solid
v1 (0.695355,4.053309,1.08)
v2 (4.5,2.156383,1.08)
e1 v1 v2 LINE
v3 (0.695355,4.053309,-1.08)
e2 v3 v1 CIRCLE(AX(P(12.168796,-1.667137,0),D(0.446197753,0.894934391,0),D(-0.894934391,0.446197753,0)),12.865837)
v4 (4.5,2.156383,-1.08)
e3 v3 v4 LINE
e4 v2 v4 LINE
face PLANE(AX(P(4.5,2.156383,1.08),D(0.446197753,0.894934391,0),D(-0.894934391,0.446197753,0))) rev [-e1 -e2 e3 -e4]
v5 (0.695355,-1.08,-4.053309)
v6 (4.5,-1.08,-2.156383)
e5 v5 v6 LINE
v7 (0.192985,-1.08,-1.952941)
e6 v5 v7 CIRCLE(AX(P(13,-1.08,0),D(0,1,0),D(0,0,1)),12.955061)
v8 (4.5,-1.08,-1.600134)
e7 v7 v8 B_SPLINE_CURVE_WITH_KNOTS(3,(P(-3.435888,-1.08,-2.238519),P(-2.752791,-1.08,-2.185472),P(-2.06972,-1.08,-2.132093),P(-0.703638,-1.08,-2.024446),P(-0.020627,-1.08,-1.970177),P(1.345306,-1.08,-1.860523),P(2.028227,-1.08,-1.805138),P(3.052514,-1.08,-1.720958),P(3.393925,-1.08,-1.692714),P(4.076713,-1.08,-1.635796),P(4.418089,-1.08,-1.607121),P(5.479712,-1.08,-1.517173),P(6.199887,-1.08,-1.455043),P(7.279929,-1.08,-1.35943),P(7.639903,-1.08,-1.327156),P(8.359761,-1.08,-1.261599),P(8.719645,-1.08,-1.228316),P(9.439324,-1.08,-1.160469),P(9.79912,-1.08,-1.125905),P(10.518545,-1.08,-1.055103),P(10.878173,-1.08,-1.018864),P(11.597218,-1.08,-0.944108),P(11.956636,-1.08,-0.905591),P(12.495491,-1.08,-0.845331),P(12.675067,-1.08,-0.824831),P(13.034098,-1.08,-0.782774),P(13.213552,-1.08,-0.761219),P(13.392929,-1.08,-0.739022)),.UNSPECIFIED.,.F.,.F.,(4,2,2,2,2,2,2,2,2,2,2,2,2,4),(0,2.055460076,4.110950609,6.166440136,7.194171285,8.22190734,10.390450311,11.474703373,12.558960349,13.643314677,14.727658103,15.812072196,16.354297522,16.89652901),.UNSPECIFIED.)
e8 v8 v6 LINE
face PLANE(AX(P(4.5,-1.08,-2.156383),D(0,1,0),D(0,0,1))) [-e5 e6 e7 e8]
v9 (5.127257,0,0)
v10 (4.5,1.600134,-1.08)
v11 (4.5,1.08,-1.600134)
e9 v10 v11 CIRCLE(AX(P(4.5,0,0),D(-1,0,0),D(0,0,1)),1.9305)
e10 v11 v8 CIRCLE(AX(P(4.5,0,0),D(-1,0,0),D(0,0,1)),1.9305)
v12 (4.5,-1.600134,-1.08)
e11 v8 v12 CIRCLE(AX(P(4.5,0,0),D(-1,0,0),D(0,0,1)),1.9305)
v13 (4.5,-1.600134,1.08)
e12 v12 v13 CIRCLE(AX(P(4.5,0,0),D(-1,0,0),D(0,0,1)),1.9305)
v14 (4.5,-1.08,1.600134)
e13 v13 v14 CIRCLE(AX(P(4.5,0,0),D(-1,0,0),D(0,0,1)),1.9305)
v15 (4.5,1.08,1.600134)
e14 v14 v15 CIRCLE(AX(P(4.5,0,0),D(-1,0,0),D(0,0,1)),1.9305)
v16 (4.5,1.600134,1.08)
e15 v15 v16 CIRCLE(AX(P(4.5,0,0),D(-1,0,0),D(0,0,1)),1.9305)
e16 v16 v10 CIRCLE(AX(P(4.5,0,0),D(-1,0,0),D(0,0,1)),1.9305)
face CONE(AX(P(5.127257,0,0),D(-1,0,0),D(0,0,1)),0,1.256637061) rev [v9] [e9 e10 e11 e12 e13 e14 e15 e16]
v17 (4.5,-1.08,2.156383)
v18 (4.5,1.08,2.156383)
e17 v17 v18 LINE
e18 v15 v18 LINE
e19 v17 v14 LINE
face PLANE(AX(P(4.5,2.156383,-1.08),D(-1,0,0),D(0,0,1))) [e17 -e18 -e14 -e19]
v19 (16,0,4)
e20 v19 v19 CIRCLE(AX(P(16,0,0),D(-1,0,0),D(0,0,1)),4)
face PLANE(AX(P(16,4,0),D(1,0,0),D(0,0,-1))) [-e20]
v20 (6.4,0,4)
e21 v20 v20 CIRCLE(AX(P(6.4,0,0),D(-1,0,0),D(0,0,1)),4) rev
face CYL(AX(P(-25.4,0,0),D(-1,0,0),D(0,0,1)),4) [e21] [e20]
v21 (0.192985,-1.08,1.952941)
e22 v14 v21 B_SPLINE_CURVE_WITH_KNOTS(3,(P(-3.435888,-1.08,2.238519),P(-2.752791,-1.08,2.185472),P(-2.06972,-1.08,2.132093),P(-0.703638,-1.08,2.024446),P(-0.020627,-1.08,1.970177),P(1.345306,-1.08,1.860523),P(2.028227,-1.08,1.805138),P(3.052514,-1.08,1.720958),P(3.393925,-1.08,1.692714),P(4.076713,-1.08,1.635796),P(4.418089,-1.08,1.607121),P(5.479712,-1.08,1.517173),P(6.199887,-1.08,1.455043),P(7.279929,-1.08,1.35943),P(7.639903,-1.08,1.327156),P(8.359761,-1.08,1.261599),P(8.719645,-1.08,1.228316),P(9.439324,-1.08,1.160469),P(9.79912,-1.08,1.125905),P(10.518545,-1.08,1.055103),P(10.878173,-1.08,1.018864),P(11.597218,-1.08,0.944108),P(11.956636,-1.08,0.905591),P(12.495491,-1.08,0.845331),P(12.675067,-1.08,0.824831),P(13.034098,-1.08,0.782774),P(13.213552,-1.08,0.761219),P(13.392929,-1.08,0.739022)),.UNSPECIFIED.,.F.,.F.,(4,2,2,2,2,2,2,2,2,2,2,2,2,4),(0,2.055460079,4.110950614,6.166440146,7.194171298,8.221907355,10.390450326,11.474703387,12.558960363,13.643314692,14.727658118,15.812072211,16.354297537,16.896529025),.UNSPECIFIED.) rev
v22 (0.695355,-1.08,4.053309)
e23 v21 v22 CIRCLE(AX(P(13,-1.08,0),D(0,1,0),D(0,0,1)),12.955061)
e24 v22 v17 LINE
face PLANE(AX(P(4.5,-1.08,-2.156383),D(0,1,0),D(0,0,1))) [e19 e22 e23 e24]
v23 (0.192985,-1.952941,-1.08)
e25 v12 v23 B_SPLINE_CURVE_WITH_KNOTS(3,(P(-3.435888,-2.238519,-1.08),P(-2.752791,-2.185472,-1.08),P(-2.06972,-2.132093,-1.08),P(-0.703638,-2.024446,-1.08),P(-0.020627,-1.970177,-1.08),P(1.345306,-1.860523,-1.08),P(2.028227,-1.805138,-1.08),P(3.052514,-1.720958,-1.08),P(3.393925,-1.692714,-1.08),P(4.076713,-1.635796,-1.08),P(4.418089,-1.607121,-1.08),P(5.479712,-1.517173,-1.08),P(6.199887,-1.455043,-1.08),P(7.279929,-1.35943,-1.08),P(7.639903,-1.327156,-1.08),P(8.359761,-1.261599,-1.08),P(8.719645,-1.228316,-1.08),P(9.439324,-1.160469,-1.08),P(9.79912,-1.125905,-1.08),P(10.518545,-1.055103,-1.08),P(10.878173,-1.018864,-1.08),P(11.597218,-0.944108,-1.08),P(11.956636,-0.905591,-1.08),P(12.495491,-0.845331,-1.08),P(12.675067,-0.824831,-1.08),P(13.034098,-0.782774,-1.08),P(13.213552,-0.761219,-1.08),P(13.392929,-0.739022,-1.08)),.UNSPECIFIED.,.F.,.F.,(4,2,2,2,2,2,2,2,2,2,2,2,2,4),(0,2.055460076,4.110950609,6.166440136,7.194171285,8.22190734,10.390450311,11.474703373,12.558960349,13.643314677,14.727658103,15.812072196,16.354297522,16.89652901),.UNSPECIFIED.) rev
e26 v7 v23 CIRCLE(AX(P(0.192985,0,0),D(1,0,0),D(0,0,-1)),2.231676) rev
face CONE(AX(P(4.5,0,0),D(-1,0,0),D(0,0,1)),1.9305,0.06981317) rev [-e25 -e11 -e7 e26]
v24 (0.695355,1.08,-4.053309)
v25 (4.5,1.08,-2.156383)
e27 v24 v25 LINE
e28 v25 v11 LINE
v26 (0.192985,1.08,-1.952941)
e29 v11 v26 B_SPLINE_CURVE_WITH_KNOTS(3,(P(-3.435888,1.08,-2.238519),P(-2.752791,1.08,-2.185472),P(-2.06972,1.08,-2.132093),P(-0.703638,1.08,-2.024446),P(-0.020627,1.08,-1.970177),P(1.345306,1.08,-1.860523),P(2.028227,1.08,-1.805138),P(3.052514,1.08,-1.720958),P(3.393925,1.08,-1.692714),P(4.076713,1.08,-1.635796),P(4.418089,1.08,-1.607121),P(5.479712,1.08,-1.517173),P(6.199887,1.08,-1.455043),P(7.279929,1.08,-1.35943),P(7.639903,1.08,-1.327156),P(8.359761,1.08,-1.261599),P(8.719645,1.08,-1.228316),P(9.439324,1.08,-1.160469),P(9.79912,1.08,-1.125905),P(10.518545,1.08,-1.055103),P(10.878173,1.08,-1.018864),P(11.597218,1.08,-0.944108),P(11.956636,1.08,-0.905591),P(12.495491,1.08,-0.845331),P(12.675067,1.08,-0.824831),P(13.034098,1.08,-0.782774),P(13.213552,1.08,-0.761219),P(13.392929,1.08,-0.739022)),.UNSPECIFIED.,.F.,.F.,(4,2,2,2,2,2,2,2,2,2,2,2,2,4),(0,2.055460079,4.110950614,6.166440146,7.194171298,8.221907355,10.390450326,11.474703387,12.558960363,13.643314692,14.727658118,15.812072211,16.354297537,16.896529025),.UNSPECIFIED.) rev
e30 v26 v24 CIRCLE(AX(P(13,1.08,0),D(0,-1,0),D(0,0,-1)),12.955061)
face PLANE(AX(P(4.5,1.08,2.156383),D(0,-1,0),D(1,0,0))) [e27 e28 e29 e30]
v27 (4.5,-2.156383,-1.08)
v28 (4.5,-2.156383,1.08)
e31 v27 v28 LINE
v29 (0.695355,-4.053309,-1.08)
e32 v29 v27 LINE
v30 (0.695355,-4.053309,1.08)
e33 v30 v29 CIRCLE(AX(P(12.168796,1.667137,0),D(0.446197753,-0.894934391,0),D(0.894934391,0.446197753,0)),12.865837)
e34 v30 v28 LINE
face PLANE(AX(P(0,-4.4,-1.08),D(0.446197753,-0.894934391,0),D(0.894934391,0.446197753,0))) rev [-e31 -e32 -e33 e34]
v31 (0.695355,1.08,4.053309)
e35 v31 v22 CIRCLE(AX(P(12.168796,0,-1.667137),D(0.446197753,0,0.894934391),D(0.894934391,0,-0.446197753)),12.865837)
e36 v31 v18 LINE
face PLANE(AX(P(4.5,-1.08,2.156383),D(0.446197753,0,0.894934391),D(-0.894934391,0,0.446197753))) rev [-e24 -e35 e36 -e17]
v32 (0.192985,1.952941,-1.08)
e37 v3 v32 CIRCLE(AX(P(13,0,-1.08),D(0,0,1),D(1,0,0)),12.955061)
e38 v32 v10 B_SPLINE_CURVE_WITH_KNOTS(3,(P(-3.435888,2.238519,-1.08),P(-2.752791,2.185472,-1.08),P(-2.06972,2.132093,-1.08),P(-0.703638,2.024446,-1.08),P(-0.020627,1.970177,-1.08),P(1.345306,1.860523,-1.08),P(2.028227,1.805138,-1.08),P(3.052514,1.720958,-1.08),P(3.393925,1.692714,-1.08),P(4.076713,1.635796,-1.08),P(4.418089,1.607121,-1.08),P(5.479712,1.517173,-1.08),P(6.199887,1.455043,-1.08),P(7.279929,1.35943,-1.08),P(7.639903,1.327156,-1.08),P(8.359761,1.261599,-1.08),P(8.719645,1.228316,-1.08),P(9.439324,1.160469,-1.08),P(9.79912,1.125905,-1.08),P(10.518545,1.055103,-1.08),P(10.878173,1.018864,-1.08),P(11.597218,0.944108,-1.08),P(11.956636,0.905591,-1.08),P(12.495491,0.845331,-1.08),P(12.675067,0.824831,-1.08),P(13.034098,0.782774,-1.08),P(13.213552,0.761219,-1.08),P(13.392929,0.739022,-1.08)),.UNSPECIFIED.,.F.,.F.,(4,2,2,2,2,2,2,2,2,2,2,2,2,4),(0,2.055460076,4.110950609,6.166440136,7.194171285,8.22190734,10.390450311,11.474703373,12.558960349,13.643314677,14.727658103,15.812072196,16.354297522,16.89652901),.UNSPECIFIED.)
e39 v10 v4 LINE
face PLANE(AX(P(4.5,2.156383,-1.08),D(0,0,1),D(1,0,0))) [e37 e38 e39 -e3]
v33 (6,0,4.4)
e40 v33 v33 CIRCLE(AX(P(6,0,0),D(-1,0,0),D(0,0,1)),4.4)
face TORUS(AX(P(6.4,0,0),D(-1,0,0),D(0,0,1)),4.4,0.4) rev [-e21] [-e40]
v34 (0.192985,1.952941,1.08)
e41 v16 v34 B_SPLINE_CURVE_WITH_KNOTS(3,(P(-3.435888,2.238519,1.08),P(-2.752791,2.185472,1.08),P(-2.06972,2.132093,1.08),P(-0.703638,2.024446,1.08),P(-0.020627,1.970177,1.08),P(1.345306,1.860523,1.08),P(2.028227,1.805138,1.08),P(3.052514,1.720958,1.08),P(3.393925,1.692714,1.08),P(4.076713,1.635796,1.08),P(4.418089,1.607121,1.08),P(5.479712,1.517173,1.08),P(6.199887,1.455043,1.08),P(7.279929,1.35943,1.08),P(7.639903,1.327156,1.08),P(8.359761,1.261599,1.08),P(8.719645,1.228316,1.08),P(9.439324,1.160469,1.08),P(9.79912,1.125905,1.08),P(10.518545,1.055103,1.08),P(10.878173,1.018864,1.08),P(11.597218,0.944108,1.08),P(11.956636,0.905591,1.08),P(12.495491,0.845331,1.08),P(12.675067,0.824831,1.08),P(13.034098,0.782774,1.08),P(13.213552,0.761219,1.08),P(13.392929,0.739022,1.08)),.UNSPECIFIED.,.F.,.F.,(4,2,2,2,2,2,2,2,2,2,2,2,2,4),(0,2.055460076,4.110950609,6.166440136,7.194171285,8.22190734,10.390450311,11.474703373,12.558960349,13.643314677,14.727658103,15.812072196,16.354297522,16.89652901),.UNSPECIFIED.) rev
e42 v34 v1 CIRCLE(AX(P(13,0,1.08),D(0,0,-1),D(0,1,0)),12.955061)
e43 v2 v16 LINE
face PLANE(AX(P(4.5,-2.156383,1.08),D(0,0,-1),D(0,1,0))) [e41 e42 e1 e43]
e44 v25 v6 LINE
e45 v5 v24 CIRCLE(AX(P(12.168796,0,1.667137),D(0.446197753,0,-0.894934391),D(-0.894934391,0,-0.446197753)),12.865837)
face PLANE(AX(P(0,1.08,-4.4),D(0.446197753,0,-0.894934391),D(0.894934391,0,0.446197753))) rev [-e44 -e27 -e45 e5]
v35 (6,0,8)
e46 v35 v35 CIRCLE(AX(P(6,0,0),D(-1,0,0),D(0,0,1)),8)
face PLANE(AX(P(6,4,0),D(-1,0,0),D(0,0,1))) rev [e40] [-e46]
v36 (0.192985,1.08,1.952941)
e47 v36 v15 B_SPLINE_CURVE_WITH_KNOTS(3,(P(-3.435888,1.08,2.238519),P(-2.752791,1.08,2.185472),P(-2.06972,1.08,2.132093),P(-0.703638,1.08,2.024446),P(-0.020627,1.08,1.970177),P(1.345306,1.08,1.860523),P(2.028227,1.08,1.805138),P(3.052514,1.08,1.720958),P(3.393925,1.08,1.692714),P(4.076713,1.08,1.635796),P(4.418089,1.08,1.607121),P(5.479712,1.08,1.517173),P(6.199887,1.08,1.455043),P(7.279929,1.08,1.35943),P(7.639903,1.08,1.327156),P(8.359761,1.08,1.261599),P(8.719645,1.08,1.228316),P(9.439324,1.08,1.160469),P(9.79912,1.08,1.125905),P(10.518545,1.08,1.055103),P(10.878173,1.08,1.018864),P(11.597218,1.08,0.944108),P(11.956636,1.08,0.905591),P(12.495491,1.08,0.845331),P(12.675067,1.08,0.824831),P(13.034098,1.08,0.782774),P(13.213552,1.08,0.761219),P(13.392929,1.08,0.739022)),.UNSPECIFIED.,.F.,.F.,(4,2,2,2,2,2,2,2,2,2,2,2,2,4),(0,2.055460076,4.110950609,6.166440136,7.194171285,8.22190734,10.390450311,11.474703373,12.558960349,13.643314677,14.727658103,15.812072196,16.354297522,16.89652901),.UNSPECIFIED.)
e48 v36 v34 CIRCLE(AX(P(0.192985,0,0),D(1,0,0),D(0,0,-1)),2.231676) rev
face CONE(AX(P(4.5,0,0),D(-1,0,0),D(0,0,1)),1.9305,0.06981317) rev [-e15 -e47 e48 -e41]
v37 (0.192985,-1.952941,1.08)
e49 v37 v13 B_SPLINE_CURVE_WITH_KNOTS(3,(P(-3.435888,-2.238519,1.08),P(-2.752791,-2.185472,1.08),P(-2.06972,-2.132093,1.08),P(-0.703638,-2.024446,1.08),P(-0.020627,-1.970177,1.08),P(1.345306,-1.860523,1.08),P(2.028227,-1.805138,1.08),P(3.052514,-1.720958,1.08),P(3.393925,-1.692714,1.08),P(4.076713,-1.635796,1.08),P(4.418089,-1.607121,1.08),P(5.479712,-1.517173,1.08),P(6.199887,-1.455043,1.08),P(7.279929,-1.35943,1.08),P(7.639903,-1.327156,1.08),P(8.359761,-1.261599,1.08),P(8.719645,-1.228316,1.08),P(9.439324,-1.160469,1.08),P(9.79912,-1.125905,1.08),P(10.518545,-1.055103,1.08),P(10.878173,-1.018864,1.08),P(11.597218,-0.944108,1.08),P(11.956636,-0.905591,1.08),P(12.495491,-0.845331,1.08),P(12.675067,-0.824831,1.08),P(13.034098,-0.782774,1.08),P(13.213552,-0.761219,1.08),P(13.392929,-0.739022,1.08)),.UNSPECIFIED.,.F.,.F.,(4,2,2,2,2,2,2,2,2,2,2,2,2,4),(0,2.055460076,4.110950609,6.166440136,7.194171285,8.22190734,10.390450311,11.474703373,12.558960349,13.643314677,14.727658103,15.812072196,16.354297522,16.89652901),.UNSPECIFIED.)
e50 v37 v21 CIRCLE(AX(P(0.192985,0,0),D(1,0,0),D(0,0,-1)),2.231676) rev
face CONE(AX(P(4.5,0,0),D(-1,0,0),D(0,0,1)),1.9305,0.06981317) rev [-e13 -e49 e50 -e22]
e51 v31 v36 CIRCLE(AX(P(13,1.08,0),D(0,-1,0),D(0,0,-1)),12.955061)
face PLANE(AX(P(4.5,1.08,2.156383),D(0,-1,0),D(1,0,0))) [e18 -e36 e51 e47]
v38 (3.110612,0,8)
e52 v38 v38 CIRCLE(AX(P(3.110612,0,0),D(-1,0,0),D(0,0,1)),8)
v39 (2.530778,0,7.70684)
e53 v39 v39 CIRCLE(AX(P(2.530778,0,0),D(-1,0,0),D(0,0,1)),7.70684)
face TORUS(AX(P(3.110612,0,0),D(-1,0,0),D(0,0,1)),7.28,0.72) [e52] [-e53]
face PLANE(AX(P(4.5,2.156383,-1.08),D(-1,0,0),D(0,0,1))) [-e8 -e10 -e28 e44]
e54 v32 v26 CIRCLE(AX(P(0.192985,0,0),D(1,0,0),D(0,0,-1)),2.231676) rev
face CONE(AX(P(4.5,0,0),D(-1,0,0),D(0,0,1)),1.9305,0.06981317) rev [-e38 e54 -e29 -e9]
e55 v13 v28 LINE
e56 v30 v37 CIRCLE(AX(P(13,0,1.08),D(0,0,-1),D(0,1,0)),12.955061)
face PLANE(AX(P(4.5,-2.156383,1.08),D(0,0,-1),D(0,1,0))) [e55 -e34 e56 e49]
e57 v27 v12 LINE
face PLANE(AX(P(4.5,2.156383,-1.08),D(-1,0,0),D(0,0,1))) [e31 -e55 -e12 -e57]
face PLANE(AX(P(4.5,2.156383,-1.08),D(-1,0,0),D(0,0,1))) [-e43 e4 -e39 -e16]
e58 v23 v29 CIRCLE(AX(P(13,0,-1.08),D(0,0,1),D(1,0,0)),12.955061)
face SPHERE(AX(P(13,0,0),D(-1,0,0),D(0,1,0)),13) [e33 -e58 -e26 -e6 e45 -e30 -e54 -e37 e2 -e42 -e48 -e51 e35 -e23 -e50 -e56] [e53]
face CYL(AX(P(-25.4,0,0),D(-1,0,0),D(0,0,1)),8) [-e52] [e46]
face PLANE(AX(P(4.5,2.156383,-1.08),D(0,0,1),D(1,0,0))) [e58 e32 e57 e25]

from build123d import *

# Parameters (mm, degrees)
RECPAT_COUNT = 2
RECPAT_ANGLE = 90


with BuildPart() as part:
    # Fillet1: read off the stored shape, not the designer's step
    # Fillet1 outline → Fillet1 (revolve)
    with BuildSketch(Plane.YX):
        with BuildLine():
            Line((4, 6.4), (4, 16))
            Line((4, 16), (0, 16))
            Line((0, 16), (0, 0))
            ThreePointArc((0, 0), (4.055866915, 0.648888974), (7.706840396, 2.530777913))
            ThreePointArc((7.706840396, 2.530777913), (7.922543805, 2.785746454), (8, 3.110611748))
            Line((8, 3.110611748), (8, 6))
            Line((8, 6), (4.4, 6))
            ThreePointArc((4.4, 6), (4.117157288, 6.117157288), (4, 6.4))
        make_face()
    revolve(axis=Axis((0, 0, 0), (1, 0, 0)))

    # Sketch3 → Recess section 0
    with BuildSketch(Plane(origin=(0, 0, 0), x_dir=(0, 0, -1), z_dir=(1, 0, 0))):
        with BuildLine():
            Line((1.08, -4.4), (-1.08, -4.4))
            Line((-1.08, -4.4), (-1.08, 4.4))
            Line((-1.08, 4.4), (1.08, 4.4))
            Line((1.08, 4.4), (1.08, -4.4))
        make_face()
    # Sketch4 → Recess section 1
    with BuildSketch(Plane(origin=(4.5, 0, 0), x_dir=(0, 0, -1), z_dir=(1, 0, 0))):
        with BuildLine():
            Line((1.08, -2.156383139), (-1.08, -2.156383139))
            Line((-1.08, -2.156383139), (-1.08, 2.156383139))
            Line((-1.08, 2.156383139), (1.08, 2.156383139))
            Line((1.08, 2.156383139), (1.08, -2.156383139))
        make_face()
    recess = loft(mode=Mode.SUBTRACT)

    # RecPat: Recess ×2 about axis
    recpat_axis = Axis((0, 0, 0), (1, 0, 0))
    for i in range(1, RECPAT_COUNT):
        add(recess.rotate(recpat_axis, i * RECPAT_ANGLE / (RECPAT_COUNT - 1)), mode=Mode.SUBTRACT)

    # RecCorSke → RecessCore (revolve, cut)
    with BuildSketch(Plane.XY, mode=Mode.PRIVATE) as recesscore_sk:
        Polygon((0, 0), (0, 2.245170654), (4.5, 1.9305), (5.127257474, 0), align=None)
    revolve(recesscore_sk.sketch.rotate(Axis((-3.175, 0, 0), (1, 0, 0)), 90), axis=Axis((-3.175, 0, 0), (1, 0, 0)), mode=Mode.SUBTRACT)


solid = part.part
